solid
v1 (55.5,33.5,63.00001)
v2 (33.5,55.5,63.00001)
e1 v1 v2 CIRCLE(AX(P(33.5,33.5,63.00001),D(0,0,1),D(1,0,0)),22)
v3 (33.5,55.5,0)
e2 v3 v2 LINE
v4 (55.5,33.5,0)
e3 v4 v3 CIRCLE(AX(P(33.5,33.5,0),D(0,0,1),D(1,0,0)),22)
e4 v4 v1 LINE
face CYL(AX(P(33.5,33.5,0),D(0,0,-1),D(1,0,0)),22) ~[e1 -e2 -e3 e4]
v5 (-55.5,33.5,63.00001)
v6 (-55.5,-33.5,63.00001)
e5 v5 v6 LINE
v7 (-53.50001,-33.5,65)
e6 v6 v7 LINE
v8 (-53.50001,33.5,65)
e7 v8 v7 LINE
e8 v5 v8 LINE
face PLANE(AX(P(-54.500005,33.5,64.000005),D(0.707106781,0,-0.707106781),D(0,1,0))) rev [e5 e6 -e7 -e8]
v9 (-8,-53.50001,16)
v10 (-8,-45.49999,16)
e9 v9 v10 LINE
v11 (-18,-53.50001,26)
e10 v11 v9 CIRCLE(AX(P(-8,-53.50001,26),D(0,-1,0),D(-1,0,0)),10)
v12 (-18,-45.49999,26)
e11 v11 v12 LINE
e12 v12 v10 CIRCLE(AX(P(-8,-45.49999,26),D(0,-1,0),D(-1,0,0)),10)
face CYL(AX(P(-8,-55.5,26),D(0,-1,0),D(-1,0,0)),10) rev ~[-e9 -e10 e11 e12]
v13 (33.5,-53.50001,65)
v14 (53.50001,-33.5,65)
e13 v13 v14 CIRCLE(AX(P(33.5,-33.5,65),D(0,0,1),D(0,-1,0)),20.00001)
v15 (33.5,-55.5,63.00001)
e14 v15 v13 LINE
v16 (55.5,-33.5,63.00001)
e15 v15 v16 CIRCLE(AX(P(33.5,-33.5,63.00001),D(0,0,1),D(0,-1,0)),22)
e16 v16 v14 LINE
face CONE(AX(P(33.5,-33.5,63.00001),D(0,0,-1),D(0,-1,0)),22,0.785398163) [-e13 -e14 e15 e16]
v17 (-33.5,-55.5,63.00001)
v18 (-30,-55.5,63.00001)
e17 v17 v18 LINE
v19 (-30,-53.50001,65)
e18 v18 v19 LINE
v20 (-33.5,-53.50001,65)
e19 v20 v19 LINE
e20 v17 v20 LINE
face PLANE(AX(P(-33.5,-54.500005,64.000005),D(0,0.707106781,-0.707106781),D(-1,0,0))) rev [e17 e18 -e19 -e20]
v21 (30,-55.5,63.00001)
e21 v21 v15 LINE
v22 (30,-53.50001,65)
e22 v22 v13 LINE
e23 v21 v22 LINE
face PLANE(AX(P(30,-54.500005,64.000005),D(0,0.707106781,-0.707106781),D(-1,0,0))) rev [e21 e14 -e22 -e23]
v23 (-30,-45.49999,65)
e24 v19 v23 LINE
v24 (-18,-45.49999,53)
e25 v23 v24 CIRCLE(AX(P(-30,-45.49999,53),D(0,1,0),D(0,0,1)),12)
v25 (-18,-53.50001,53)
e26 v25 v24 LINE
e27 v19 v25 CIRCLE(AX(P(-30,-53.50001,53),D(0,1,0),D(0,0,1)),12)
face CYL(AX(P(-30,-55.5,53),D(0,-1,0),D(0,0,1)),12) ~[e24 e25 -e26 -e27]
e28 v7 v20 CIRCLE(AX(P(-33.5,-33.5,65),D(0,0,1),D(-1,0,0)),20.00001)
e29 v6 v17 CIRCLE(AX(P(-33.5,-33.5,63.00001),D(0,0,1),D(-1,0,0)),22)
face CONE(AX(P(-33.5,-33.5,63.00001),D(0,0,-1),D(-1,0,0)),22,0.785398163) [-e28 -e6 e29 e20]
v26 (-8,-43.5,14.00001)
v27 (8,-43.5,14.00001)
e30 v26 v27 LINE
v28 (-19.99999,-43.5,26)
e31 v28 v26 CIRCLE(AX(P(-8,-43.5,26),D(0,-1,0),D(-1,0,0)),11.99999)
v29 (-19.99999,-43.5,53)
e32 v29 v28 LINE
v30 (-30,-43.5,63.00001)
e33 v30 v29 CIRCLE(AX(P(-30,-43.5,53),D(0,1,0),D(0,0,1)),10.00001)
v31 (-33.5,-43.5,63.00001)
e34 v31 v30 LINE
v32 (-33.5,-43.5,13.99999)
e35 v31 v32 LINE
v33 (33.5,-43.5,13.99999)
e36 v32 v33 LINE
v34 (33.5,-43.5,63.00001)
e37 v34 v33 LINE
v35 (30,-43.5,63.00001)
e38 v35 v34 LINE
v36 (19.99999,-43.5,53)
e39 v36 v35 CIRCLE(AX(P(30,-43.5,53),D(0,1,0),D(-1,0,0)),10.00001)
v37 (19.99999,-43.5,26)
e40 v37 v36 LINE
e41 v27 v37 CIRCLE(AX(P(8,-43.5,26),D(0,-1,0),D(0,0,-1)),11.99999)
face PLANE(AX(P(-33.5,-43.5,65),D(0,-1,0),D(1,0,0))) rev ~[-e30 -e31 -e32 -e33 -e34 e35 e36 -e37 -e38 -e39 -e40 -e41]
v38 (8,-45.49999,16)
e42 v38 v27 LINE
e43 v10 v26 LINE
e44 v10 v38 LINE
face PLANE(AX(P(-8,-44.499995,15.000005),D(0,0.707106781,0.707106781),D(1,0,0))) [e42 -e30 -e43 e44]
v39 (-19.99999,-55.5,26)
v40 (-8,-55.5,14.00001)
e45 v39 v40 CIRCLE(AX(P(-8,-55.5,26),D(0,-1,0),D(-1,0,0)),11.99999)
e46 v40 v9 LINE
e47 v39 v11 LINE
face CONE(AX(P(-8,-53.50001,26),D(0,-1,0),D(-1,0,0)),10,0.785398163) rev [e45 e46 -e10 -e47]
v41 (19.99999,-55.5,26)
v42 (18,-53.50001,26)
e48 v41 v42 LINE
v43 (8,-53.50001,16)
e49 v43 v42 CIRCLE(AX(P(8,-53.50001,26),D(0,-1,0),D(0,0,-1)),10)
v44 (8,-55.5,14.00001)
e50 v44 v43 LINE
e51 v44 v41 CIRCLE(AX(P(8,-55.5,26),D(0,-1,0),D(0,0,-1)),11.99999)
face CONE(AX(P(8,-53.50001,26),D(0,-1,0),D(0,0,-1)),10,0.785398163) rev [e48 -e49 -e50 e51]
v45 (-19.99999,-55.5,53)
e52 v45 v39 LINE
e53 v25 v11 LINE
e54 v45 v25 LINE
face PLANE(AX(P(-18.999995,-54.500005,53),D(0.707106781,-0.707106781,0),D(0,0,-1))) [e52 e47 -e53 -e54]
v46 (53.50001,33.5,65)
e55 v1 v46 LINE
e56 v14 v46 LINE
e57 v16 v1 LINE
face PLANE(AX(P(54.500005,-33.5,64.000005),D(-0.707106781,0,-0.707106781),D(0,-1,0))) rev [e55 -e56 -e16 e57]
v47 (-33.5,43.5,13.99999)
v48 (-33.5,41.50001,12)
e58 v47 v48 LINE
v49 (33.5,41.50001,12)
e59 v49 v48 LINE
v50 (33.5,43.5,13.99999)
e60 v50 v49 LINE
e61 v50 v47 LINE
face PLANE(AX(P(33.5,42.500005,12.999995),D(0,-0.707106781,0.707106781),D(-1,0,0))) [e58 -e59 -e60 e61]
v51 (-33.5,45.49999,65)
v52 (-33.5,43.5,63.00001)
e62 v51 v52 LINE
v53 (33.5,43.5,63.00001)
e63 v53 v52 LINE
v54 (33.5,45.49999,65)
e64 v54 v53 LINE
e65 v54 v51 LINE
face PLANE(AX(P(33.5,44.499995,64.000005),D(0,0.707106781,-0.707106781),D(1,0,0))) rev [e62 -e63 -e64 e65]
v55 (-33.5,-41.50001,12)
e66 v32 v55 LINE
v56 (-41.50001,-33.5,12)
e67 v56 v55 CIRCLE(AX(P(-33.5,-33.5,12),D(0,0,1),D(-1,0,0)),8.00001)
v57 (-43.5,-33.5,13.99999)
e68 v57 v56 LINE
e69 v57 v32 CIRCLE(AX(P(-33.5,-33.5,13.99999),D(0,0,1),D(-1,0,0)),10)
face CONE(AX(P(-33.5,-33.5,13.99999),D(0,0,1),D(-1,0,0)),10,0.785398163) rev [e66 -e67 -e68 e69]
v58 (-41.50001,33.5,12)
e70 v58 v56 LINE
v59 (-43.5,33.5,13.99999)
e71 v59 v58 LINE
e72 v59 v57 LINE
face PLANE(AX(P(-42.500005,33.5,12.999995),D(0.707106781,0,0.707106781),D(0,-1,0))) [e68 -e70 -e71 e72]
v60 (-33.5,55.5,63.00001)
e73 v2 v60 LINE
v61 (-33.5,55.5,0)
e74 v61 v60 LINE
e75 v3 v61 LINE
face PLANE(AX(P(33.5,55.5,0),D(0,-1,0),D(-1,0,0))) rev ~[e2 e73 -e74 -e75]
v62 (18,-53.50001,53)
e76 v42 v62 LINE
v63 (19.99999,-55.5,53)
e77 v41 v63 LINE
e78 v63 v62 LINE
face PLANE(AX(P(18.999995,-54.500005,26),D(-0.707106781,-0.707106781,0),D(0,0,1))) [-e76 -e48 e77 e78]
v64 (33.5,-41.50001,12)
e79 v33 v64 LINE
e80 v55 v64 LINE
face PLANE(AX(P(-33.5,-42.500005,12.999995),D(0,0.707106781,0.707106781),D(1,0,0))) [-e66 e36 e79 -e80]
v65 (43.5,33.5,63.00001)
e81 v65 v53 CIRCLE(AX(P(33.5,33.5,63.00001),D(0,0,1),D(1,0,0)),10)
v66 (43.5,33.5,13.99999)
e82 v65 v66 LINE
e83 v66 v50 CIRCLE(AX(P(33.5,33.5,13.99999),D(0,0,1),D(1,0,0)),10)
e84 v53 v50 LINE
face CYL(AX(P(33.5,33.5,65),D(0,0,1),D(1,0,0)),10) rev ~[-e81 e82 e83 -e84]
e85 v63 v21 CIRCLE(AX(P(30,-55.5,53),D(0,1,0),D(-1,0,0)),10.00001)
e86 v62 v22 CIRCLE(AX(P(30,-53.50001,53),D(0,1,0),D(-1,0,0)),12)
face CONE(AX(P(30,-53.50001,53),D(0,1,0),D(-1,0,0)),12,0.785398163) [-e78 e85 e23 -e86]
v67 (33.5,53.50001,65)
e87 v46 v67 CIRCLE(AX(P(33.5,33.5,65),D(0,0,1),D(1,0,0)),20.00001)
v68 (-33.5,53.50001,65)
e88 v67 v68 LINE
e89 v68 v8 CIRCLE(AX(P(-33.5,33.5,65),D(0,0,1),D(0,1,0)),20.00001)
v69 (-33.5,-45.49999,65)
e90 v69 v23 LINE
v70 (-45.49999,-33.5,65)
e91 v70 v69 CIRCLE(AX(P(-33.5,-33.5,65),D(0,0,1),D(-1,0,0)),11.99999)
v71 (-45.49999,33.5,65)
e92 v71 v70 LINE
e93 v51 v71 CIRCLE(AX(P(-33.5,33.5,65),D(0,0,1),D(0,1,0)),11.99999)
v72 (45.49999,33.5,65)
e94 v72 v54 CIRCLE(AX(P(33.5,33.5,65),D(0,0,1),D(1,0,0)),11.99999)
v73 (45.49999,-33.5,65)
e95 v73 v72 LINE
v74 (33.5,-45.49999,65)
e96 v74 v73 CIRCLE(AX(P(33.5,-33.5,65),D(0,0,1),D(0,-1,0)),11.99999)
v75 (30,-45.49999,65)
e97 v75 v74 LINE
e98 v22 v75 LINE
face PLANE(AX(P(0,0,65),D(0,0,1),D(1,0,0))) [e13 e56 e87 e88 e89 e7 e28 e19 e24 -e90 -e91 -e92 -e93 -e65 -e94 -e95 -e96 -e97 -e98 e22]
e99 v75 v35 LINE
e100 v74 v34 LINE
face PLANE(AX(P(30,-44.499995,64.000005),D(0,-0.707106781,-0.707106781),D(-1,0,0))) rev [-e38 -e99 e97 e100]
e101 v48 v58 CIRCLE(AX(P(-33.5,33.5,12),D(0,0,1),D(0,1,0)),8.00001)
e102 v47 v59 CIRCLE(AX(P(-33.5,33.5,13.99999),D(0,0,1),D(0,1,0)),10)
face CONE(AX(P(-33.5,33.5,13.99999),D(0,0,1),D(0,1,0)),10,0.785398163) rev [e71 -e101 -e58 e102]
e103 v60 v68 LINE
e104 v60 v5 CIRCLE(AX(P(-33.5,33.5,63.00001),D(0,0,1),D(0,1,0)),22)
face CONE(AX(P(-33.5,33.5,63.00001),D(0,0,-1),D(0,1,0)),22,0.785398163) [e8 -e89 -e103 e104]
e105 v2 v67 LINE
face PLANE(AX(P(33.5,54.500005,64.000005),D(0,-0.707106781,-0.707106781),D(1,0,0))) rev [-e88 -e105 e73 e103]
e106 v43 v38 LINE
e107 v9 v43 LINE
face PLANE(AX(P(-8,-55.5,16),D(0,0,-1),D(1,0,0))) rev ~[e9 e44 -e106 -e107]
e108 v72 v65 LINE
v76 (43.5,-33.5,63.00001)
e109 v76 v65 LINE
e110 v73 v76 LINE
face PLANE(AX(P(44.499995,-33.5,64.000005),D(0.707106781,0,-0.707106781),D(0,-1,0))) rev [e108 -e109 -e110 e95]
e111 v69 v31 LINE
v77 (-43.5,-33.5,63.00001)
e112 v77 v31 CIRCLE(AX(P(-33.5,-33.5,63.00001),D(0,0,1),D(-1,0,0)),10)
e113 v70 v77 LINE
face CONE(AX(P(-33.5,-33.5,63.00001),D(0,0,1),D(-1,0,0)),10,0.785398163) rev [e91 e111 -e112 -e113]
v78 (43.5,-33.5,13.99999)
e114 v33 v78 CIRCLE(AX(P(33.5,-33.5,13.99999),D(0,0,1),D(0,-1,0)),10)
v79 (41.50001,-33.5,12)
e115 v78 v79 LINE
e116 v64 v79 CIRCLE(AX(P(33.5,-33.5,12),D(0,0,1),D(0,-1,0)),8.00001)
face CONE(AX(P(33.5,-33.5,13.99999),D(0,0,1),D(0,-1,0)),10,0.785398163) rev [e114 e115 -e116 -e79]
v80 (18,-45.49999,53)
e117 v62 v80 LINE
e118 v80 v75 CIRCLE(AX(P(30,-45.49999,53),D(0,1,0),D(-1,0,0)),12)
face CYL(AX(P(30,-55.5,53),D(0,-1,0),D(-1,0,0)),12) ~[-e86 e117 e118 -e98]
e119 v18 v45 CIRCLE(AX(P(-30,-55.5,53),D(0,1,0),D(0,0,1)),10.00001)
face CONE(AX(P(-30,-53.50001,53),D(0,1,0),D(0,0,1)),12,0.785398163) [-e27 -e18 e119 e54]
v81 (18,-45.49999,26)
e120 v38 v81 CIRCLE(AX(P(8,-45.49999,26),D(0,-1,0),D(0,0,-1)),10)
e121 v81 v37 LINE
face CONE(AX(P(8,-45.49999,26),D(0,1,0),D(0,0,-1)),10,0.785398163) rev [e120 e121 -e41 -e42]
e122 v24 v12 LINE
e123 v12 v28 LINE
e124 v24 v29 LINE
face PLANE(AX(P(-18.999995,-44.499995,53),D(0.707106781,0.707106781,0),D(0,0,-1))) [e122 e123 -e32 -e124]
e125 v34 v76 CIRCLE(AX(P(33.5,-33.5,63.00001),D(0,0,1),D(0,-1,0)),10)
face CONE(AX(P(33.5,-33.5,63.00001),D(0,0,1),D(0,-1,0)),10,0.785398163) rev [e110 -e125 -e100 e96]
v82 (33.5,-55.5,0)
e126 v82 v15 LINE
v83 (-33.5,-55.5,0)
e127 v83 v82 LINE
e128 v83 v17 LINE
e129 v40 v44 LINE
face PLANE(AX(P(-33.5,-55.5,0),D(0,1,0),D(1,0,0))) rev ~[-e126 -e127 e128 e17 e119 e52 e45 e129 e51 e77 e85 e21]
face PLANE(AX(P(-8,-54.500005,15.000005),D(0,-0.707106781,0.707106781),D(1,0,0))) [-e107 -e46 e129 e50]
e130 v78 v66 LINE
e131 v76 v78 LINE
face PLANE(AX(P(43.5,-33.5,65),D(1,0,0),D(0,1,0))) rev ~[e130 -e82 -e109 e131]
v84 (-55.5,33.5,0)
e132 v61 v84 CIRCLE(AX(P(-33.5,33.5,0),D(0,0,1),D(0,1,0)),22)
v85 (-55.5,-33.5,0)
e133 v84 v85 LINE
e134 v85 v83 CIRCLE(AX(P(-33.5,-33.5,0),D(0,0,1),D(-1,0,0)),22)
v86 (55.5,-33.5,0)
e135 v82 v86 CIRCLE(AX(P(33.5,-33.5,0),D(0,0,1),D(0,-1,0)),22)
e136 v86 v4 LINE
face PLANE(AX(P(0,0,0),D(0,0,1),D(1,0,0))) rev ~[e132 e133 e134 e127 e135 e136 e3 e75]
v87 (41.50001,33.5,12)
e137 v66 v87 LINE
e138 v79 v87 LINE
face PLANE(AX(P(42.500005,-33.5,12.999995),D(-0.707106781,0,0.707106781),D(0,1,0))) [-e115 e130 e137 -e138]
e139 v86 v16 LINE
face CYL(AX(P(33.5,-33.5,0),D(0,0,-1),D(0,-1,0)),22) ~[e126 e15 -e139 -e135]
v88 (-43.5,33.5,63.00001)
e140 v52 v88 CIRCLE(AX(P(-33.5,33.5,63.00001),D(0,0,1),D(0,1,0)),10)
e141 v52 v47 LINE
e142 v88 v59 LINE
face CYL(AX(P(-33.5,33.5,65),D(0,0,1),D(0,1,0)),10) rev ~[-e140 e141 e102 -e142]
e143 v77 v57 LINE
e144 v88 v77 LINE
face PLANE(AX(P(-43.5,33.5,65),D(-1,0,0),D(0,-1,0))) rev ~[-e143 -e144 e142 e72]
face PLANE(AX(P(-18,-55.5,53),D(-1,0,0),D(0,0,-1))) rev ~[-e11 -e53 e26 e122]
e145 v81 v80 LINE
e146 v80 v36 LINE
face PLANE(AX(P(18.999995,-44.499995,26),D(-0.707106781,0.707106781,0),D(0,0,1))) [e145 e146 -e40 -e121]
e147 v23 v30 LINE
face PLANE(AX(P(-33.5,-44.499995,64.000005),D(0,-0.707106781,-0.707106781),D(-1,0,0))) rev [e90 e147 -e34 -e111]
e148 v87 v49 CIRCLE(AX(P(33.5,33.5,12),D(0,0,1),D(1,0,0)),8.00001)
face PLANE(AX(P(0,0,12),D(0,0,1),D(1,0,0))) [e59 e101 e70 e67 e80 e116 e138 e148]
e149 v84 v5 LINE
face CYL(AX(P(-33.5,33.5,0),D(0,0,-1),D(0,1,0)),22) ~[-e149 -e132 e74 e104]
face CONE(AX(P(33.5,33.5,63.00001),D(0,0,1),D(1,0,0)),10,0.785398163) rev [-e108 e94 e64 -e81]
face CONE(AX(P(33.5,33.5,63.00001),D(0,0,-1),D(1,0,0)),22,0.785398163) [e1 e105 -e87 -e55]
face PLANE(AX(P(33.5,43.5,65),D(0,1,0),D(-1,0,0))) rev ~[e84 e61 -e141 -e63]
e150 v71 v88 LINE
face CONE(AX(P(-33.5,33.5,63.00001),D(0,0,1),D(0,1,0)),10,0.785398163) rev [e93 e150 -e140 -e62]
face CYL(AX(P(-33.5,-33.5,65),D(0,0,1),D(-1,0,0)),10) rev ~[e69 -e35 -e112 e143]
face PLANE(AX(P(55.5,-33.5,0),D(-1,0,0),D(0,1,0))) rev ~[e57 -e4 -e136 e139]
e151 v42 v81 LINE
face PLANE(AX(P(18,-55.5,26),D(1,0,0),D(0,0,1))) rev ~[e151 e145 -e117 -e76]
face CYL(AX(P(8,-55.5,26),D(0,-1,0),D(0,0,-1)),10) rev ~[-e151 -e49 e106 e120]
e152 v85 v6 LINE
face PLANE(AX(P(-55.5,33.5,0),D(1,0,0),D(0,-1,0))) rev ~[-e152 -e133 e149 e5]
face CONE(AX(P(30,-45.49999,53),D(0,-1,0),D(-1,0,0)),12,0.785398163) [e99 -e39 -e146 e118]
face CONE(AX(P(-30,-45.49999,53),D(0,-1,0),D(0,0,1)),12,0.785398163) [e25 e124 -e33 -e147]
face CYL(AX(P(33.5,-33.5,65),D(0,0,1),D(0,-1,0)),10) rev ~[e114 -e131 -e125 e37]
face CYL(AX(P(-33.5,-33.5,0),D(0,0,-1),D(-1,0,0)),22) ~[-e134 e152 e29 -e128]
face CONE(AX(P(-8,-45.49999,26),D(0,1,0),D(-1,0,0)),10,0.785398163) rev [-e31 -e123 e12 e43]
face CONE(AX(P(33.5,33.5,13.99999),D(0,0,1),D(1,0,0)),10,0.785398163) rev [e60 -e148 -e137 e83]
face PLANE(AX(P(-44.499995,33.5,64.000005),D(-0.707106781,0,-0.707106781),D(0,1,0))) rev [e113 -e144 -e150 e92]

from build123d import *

# Parameters (mm, degrees)
F1_DEPTH = 65
F3_DEPTH = 53
F5_DEPTH = 12
F6_SIZE  = 1.99999


# Not quite as in the source:
# - a fillet or chamfer is up to 0.001 mm smaller than in the source, because OpenCascade refuses the exact size


with BuildPart() as f1:
    # F0 (on Top) → F1 (new body)
    with BuildSketch(Plane.XY):
        with BuildLine():
            Line((55.5, -33.5), (55.5, 33.5))
            ThreePointArc((55.5, 33.5), (49.0563491861, 49.0563491861), (33.5, 55.5))
            Line((33.5, 55.5), (-33.5, 55.5))
            ThreePointArc((-33.5, 55.5), (-49.0563491861, 49.0563491861), (-55.5, 33.5))
            Line((-55.5, 33.5), (-55.5, -33.5))
            ThreePointArc((-55.5, -33.5), (-49.0563491861, -49.0563491861), (-33.5, -55.5))
            Line((-33.5, -55.5), (33.5, -55.5))
            ThreePointArc((33.5, -55.5), (49.0563491861, -49.0563491861), (55.5, -33.5))
        make_face()
    extrude(amount=F1_DEPTH)

    # F2 (on face) → F3 (cut, through all)
    with BuildSketch(Plane.XY.offset(65)):
        with BuildLine():
            Line((33.5, 43.5), (-33.5, 43.5))
            ThreePointArc((-33.5, 43.5), (-40.5710678119, 40.5710678119), (-43.5, 33.5))
            Line((-43.5, 33.5), (-43.5, -33.5))
            ThreePointArc((-43.5, -33.5), (-40.5710678119, -40.5710678119), (-33.5, -43.5))
            Line((-33.5, -43.5), (33.5, -43.5))
            ThreePointArc((33.5, -43.5), (40.5710678119, -40.5710678119), (43.5, -33.5))
            Line((43.5, -33.5), (43.5, 33.5))
            ThreePointArc((43.5, 33.5), (40.5710678119, 40.5710678119), (33.5, 43.5))
        make_face()
    extrude(amount=-F3_DEPTH, mode=Mode.SUBTRACT)

    # F4 (on face) → F5 (cut, through all)
    with BuildSketch(Plane.XZ.offset(55.5)):
        with BuildLine():
            ThreePointArc((-30, 65), (-21.5147186258, 61.4852813742), (-18, 53))
            Line((-18, 53), (-18, 26))
            ThreePointArc((-18, 26), (-15.0710678119, 18.9289321881), (-8, 16))
            Line((-8, 16), (8, 16))
            ThreePointArc((8, 16), (15.0710678119, 18.9289321881), (18, 26))
            Line((18, 26), (18, 53))
            ThreePointArc((18, 53), (21.5147186258, 61.4852813742), (30, 65))
            Line((30, 65), (-30, 65))
        make_face()
    extrude(amount=-F5_DEPTH, mode=Mode.SUBTRACT)

    # F6 (size 2 in the source; OpenCascade refuses exactly that, so slightly less here)
    f6_edges = [f1.edges().sort_by_distance(p)[0] for p in [
        (55.5, 0, 65),
        (-43.5, 0, 65),
        (0, 43.5, 12),
        (-40.571068, 40.571068, 12),
        (-43.5, 0, 12),
        (-40.571068, -40.571068, 12),
        (0, -43.5, 12),
        (40.571068, -40.571068, 12),
        (43.5, 0, 12),
        (40.571068, 40.571068, 12),
    ]]
    chamfer(f6_edges, length=F6_SIZE)


solid = f1.part
